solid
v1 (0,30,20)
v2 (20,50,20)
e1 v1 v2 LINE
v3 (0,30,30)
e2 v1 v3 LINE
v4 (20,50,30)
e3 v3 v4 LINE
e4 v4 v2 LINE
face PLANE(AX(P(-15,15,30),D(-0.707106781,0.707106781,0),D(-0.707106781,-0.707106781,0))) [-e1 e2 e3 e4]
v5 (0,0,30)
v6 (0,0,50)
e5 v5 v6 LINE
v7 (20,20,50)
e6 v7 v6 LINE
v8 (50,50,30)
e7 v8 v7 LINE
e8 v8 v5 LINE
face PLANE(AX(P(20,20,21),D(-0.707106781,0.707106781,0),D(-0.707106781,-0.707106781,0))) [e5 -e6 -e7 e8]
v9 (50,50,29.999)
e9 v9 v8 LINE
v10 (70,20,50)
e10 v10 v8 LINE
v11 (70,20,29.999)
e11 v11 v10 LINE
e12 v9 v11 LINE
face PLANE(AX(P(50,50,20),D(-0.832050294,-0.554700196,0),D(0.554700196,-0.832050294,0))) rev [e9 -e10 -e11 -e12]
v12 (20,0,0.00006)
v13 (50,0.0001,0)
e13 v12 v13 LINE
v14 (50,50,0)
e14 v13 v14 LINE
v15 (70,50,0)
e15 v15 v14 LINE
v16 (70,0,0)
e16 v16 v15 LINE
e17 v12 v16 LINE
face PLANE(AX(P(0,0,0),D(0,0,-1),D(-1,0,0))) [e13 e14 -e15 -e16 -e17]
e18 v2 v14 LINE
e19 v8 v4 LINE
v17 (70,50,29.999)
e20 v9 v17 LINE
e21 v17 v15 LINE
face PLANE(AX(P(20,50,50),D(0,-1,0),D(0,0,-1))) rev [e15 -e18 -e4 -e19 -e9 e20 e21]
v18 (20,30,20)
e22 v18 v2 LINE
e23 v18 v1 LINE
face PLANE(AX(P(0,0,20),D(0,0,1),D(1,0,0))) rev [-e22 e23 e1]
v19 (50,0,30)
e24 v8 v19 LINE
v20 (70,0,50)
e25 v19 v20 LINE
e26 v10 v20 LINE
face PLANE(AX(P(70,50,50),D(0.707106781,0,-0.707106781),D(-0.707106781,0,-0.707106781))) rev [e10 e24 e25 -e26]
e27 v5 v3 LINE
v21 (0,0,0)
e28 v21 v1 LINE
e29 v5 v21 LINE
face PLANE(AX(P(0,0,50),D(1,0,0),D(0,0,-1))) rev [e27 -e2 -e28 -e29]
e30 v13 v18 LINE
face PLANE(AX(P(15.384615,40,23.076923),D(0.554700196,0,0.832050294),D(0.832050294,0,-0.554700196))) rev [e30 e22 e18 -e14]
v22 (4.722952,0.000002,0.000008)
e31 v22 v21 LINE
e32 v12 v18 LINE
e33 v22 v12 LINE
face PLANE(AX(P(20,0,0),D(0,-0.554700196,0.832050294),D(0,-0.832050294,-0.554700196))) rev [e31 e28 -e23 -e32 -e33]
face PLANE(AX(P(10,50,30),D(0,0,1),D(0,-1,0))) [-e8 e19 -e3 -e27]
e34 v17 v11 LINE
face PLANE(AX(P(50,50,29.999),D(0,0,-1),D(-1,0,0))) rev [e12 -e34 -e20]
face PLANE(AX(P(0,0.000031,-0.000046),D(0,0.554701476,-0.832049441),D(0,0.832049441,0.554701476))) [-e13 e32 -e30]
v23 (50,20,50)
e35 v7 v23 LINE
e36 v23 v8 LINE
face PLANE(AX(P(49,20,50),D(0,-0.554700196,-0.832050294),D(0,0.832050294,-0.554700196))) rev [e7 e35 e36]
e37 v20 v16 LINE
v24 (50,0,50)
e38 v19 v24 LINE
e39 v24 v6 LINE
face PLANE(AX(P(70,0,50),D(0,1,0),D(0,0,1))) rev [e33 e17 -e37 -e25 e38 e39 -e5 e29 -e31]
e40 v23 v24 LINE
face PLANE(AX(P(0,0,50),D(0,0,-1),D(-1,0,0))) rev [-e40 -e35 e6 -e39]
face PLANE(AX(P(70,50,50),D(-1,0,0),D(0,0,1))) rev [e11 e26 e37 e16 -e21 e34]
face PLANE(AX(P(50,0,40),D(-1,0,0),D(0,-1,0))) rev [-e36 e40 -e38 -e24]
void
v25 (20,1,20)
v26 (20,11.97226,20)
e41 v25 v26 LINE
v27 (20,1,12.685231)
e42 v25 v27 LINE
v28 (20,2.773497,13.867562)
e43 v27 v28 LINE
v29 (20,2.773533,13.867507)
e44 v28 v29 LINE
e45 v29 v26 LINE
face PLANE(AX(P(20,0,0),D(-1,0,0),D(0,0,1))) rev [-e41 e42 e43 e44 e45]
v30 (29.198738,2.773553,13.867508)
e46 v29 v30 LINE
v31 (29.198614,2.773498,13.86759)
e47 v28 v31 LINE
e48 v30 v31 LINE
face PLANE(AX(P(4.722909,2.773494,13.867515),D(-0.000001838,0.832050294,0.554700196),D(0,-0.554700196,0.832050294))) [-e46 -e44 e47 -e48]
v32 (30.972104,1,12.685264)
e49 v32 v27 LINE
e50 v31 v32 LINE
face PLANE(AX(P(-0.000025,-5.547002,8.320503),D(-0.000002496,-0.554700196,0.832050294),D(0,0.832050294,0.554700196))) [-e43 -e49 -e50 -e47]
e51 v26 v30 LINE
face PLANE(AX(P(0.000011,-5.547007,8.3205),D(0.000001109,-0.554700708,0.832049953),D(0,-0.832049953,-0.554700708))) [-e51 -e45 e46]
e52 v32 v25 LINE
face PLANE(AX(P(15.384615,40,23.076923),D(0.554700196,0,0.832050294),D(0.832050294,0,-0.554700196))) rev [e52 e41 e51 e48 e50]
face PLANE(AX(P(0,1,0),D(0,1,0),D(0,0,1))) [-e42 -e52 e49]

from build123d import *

# Parameters (mm, degrees)
BOSS_EXTRUDE1_DEPTH  = 50
CUT_EXTRUDE2_DEPTH   = 10
CUT_EXTRUDE3_DEPTH   = 20
SKETCH4_W            = 20
SKETCH4_H            = 50
CUT_EXTRUDE4_DEPTH   = 10
CUT_EXTRUDE5_DEPTH   = 10
CUT_EXTRUDE6_DEPTH   = 20
SKETCH7_W            = 10
SKETCH7_H            = 20
CUT_EXTRUDE7_DEPTH   = 30
BOSS_EXTRUDE2_DEPTH  = 30
CUT_EXTRUDE10_DEPTH  = 72
CUT_EXTRUDE13_DEPTH  = 10
BOSS_EXTRUDE3_DEPTH  = 10
BOSS_EXTRUDE4_DEPTH  = 29
BOSS_EXTRUDE5_DEPTH  = 29
CUT_EXTRUDE15_DEPTH  = 29
CUT_EXTRUDE17_DEPTH  = 10
BOSS_EXTRUDE6_DEPTH  = 35
CUT_EXTRUDE21_DEPTH  = 10
CUT_EXTRUDE23_DEPTH  = 10
CUT_EXTRUDE24_DEPTH  = 10
CUT_EXTRUDE25_DEPTH  = 10
BOSS_EXTRUDE13_DEPTH = 19
BOSS_EXTRUDE14_DEPTH = 19
BOSS_EXTRUDE15_DEPTH = 19
CUT_EXTRUDE27_DEPTH  = 19
CUT_EXTRUDE28_DEPTH  = 10
BOSS_EXTRUDE16_DEPTH = 35
BOSS_EXTRUDE17_DEPTH = 29
CUT_EXTRUDE29_DEPTH  = 108
BOSS_EXTRUDE18_DEPTH = 30
CUT_EXTRUDE30_DEPTH  = 10
CUT_EXTRUDE31_DEPTH  = 20
CUT_EXTRUDE34_DEPTH  = 10
CUT_EXTRUDE35_DEPTH  = 10
SKETCH51_W           = 10
SKETCH51_H           = 20
BOSS_EXTRUDE20_DEPTH = 10
BOSS_EXTRUDE21_DEPTH = 10
BOSS_EXTRUDE23_DEPTH = 50
CUT_EXTRUDE36_DEPTH  = 50
SKETCH55_W           = 20
SKETCH55_H           = 9.999
CUT_EXTRUDE41_DEPTH  = 50
SKETCH57_W           = 20
SKETCH57_H           = 9.999
BOSS_EXTRUDE24_DEPTH = 30
CUT_EXTRUDE45_DEPTH  = 10
CUT_EXTRUDE46_DEPTH  = 40
BOSS_EXTRUDE25_DEPTH = 0.0001
BOSS_EXTRUDE28_DEPTH = 10
EXTRUDE_THIN1_DEPTH  = 10
BOSS_EXTRUDE30_DEPTH = 10
CUT_EXTRUDE48_DEPTH  = 10
CUT_EXTRUDE50_DEPTH  = 10
SKETCH68_W           = 25.723933528
SKETCH68_H           = 25.413889584
BOSS_EXTRUDE39_DEPTH = 1


with BuildPart() as part:
    # Sketch1 → Boss-Extrude1 (new body)
    with BuildSketch(Plane.XY):
        Polygon((0, 0), (0, 30), (20, 50), (70, 50), (70, 0), align=None)
    extrude(amount=BOSS_EXTRUDE1_DEPTH)

    # Sketch2 → Cut-Extrude2 (cut)
    with BuildSketch(Plane.XY.offset(50)):
        Polygon((0, 30), (0, 0), (50, 50), (20, 50), align=None)
    extrude(amount=-CUT_EXTRUDE2_DEPTH, mode=Mode.SUBTRACT)

    # Sketch3 → Cut-Extrude3 (cut)
    with BuildSketch(Plane.XY.offset(50)):
        Polygon((50, 20), (20, 20), (0, 0), (50, 0), align=None)
    extrude(amount=-CUT_EXTRUDE3_DEPTH, mode=Mode.SUBTRACT)

    # Sketch4 → Cut-Extrude4 (cut)
    with BuildSketch(Plane.XY.offset(50)):
        with Locations((60, 25)):
            Rectangle(SKETCH4_W, SKETCH4_H)
    extrude(amount=-CUT_EXTRUDE4_DEPTH, mode=Mode.SUBTRACT)

    # Sketch5 → Cut-Extrude5 (cut)
    with BuildSketch(Plane.XY.offset(40)):
        Polygon((50, 50), (70, 20), (70, 50), align=None)
    extrude(amount=-CUT_EXTRUDE5_DEPTH, mode=Mode.SUBTRACT)

    # Sketch6 → Cut-Extrude6 (cut)
    with BuildSketch(Plane.ZY):
        Polygon((0, 0), (20, 30), (20, 50), (0, 50), align=None)
    extrude(amount=-CUT_EXTRUDE6_DEPTH, mode=Mode.SUBTRACT)

    # Sketch7 → Cut-Extrude7 (cut)
    with BuildSketch(Plane.ZY):
        with Locations((25, 40)):
            Rectangle(SKETCH7_W, SKETCH7_H)
    extrude(amount=-CUT_EXTRUDE7_DEPTH, mode=Mode.SUBTRACT)

    # Sketch8 → Boss-Extrude2 (add)
    with BuildSketch(Plane.ZY):
        Polygon((30, 50), (30, 0), (50, 0), (50, 20), align=None)
    extrude(amount=-BOSS_EXTRUDE2_DEPTH)

    # Sketch10 → Cut-Extrude10 (cut)
    with BuildSketch(Plane.ZY):
        Polygon((30, 50), (50, 20), (50, 50), align=None)
    extrude(amount=-CUT_EXTRUDE10_DEPTH, mode=Mode.SUBTRACT)

    # Sketch11 → Cut-Extrude13 (cut)
    with BuildSketch(Plane(origin=(0, 0, 0), x_dir=(0, 0, -1), z_dir=(1, 0, 0))):
        Polygon((-30, 50), (-30, 0), (-50, 0), (-50, 20), align=None)
    extrude(amount=CUT_EXTRUDE13_DEPTH, mode=Mode.SUBTRACT)

    # Sketch12 → Boss-Extrude3 (add)
    with BuildSketch(Plane(origin=(0, 29.230769231, 43.846153846), x_dir=(1, 0, 0), z_dir=(0, 0.5547001962252294, 0.8320502943378435))):
        Polygon((30, 6.933752453), (35, 6.933752453), (30, 0.924500327), align=None)
    extrude(amount=-BOSS_EXTRUDE3_DEPTH)

    # Sketch14 → Boss-Extrude4 (add)
    with BuildSketch(Plane.XY.offset(50)):
        Polygon((50, 0), (70, 0), (70, 20), (50, 50), align=None)
    extrude(amount=-BOSS_EXTRUDE4_DEPTH)

    # Sketch15 → Boss-Extrude5 (add)
    with BuildSketch(Plane.XY.offset(50)):
        Polygon((50, 0), (0, 0), (20, 20), (50, 20), align=None)
    extrude(amount=-BOSS_EXTRUDE5_DEPTH)

    # Sketch16 → Cut-Extrude15 (cut)
    with BuildSketch(Plane.XY.offset(50)):
        Polygon((10, 10), (20, 20), (10, 20), align=None)
    extrude(amount=-CUT_EXTRUDE15_DEPTH, mode=Mode.SUBTRACT)

    # Sketch17 → Cut-Extrude17 (cut)
    with BuildSketch(Plane.XY.offset(50)):
        Polygon((50, 20), (50, 0), (70, 0), (70, 20), (50, 50), align=None)
    extrude(amount=-CUT_EXTRUDE17_DEPTH, mode=Mode.SUBTRACT)

    # Sketch18 → Boss-Extrude6 (add)
    with BuildSketch(Plane.XY.offset(50)):
        Polygon((50, 20), (50, 50), (20, 20), align=None)
    extrude(amount=-BOSS_EXTRUDE6_DEPTH)

    # Sketch20 → Cut-Extrude21 (cut)
    with BuildSketch(Plane(origin=(0, 29.230769231, 43.846153846), x_dir=(1, 0, 0), z_dir=(0, 0.5547001962252294, 0.8320502943378435))):
        Polygon((20, -11.094003925), (50, 24.96150883), (10, 24.96150883), (10, -11.094003925), align=None)
    extrude(amount=-CUT_EXTRUDE21_DEPTH, mode=Mode.SUBTRACT)

    # Sketch26 → Cut-Extrude23 (cut)
    with BuildSketch(Plane.XY.offset(50)):
        Polygon((50, 50), (50, 20), (20, 20), align=None)
    extrude(amount=-CUT_EXTRUDE23_DEPTH, mode=Mode.SUBTRACT)

    # Sketch28 → Cut-Extrude24 (cut)
    with BuildSketch(Plane.XY.offset(40)):
        Polygon((50, 20), (50, 50), (24.615384615, 20), align=None)
    extrude(amount=-CUT_EXTRUDE24_DEPTH, mode=Mode.SUBTRACT)


with BuildPart() as cut_extrude24_piece_1:
    # of the separate pieces the step leaves, piece 1, a body of its own (cut_extrude24_pieces)
    add(part.part.solids().sort_by_distance((0, 0, 0))[0])

    # Sketch32 → Boss-Extrude13 (add)
    with BuildSketch(Plane.XY.offset(35)):
        Polygon((20, 20), (50, 20), (50, 50), align=None)
    extrude(amount=-BOSS_EXTRUDE13_DEPTH)

    # Sketch33 → Boss-Extrude14 (add)
    with BuildSketch(Plane(origin=(0, 0, 0), x_dir=(0, 0, 1), z_dir=(-0.7071067811865476, 0.7071067811865475, 0))):
        Polygon((41.679497057, 20.439625842), (37.981495748, 28.284271247), (50, 28.284271247), align=None)
    extrude(amount=-BOSS_EXTRUDE14_DEPTH)

    # Sketch34 → Boss-Extrude15 (add)
    with BuildSketch(Plane(origin=(0, 20, 0), x_dir=(1, 0, 0), z_dir=(0, 1, 0))):
        Polygon((25.547001962, -37.981495748), (20, -37.981495748), (20, -50), align=None)
    extrude(amount=-BOSS_EXTRUDE15_DEPTH)

    # Sketch36 → Cut-Extrude27 (cut)
    with BuildSketch(Plane.XY.offset(35)):
        Polygon((28.399590758, 24.472243623), (24.615384615, 20), (8.952966546, 20), (8.952966546, 24.472243623), align=None)
    extrude(amount=CUT_EXTRUDE27_DEPTH, mode=Mode.SUBTRACT)

    # Sketch37 → Cut-Extrude28 (cut)
    with BuildSketch(Plane.XY.offset(35)):
        Polygon((24.472243623, 24.472243623), (20, 20), (10, 20), (10, 24.472243623), align=None)
    extrude(amount=-CUT_EXTRUDE28_DEPTH, mode=Mode.SUBTRACT)

    # Sketch39 → Boss-Extrude16 (add)
    with BuildSketch(Plane.ZY.offset(-30)):
        Polygon((30, 31.972243623), (30, 50), (21.679497057, 44.452998038), align=None)
    extrude(amount=-BOSS_EXTRUDE16_DEPTH)

    # Sketch41 → Boss-Extrude17 (add)
    with BuildSketch(Plane(origin=(20, 0, 0), x_dir=(0, 0, -1), z_dir=(1, 0, 0))):
        Polygon((-30, 0), (-50, 0), (-50, 20), (-30, 50), align=None)
    extrude(amount=BOSS_EXTRUDE17_DEPTH)

    # Sketch42 → Cut-Extrude29 (cut)
    with BuildSketch(Plane.ZY):
        Polygon((50, 50), (50, 20), (30, 50), align=None)
    extrude(amount=-CUT_EXTRUDE29_DEPTH, mode=Mode.SUBTRACT)

    # Sketch43 → Boss-Extrude18 (add)
    with BuildSketch(Plane.ZY.offset(-20)):
        Polygon((30, 50), (30, 20), (50, 20), align=None)
    extrude(amount=-BOSS_EXTRUDE18_DEPTH)

    # Sketch44 → Cut-Extrude30 (cut)
    with BuildSketch(Plane.ZY.offset(-10)):
        Polygon((30, 24.472243623), (30, 31.972243623), (35, 24.472243623), align=None)
    extrude(amount=-CUT_EXTRUDE30_DEPTH, mode=Mode.SUBTRACT)

    # Sketch45 → Cut-Extrude31 (cut)
    with BuildSketch(Plane.XY.offset(50)):
        Polygon((20, 20), (50, 50), (20, 50), align=None)
    extrude(amount=-CUT_EXTRUDE31_DEPTH, mode=Mode.SUBTRACT)

    # Sketch48 → Cut-Extrude34 (cut)
    with BuildSketch(Plane.XY.offset(40)):
        Polygon((70, 0), (70, 20), (60, 35), (50, 35), (50, 0), align=None)
        Polygon((50, 50), (50, 35), (60, 35), align=None)
    extrude(amount=-CUT_EXTRUDE34_DEPTH, mode=Mode.SUBTRACT)

    # Sketch49 → Cut-Extrude35 (cut)
    with BuildSketch(Plane.XY.offset(30)):
        Polygon((50, 50), (70, 20), (70, 50), align=None)
    extrude(amount=-CUT_EXTRUDE35_DEPTH, mode=Mode.SUBTRACT)

    # Sketch51 → Boss-Extrude20 (add)
    with BuildSketch(Plane.XY.offset(20)):
        with Locations((25, 40)):
            Rectangle(SKETCH51_W, SKETCH51_H)
        Polygon((20, 30), (0, 30), (20, 50), align=None)
    extrude(amount=BOSS_EXTRUDE20_DEPTH)

    # Sketch52 → Boss-Extrude21 (add)
    with BuildSketch(Plane.XY.offset(30)):
        Polygon((10, 10), (24.472243623, 24.472243623), (10, 24.472243623), align=None)
    extrude(amount=-BOSS_EXTRUDE21_DEPTH)

    # Sketch53 → Boss-Extrude23 (add)
    with BuildSketch(Plane(origin=(0, 0, 0), x_dir=(1, 0, 0), z_dir=(0, 1, 0))):
        Polygon((70, -30), (70, -50), (50, -30), align=None)
    extrude(amount=BOSS_EXTRUDE23_DEPTH)

    # Sketch54 → Cut-Extrude36 (cut)
    with BuildSketch(Plane(origin=(0, 0, 30), x_dir=(-1, 0, 0), z_dir=(0, 0, -1))):
        Polygon((-70, 20), (-50, 50), (-70, 50), align=None)
    extrude(amount=-CUT_EXTRUDE36_DEPTH, mode=Mode.SUBTRACT)

    # Sketch55 → Cut-Extrude41 (cut)
    with BuildSketch(Plane(origin=(0, 20, 0), x_dir=(1, 0, 0), z_dir=(0, 1, 0))):
        with Locations((60, -24.9995)):
            Rectangle(SKETCH55_W, SKETCH55_H)
    extrude(amount=CUT_EXTRUDE41_DEPTH, mode=Mode.SUBTRACT)

    # Sketch57 → Boss-Extrude24 (add)
    with BuildSketch(Plane(origin=(0, 20, 0), x_dir=(1, 0, 0), z_dir=(0, 1, 0))):
        with Locations((60, -24.9995)):
            Rectangle(SKETCH57_W, SKETCH57_H)
    extrude(amount=BOSS_EXTRUDE24_DEPTH)

    # Sketch58 → Cut-Extrude45 (cut)
    with BuildSketch(Plane(origin=(0, 50, 0), x_dir=(1, 0, 0), z_dir=(0, 1, 0))):
        Polygon((20, -20), (50, 0), (20, 0), align=None)
    extrude(amount=-CUT_EXTRUDE45_DEPTH, mode=Mode.SUBTRACT)

    # Sketch59 → Cut-Extrude46 (cut)
    with BuildSketch(Plane(origin=(0, 40, 0), x_dir=(1, 0, 0), z_dir=(0, 1, 0))):
        Polygon((20, 0), (20, -20), (50, 0), align=None)
    extrude(amount=-CUT_EXTRUDE46_DEPTH, mode=Mode.SUBTRACT)

    # Sketch60 → Boss-Extrude25 (add)
    with BuildSketch(Plane.XZ):
        Polygon((20, 0), (50, 0), (20, 20), align=None)
    extrude(amount=-BOSS_EXTRUDE25_DEPTH)

    # Sketch61 → Boss-Extrude28 (add)
    with BuildSketch(Plane(origin=(0, 3.0769e-05, -4.6154e-05), x_dir=(1, 0, 0), z_dir=(0, -0.5547014763049025, 0.8320494409499725))):
        Polygon((50, 8.3205e-05), (20, 36.055512755), (20, 8.3205e-05), align=None)
    extrude(amount=BOSS_EXTRUDE28_DEPTH)

    # Sketch62 → Extrude-Thin1 (add)
    with BuildSketch(Plane(origin=(0, 0, 0), x_dir=(-0.9999999999968847, 1.384610769127148e-06, -2.0769161536907223e-06), z_dir=(2.496142562323782e-06, 0.5547001962235016, -0.8320502943352512))):
        Polygon((0, 36.055512755), (-4.722952829, 0), (-50, 8.3205e-05), (-49.999981623, 10.000083205), (-13.498467783, 10.000016127), (-9.915295125, 37.354328597), align=None)
    extrude(amount=-EXTRUDE_THIN1_DEPTH)

    # Sketch63 → Boss-Extrude30 (add)
    with BuildSketch(Plane(origin=(0, 0, 0), x_dir=(-0.9999999999993847, -6.153857514652135e-07, 9.230773964263176e-07), z_dir=(-1.109401416485302e-06, 0.5547007082562057, -0.8320499529828923))):
        Polygon((-20, 36.055512755), (0, 0), (-50, 8.3205e-05), align=None)
    extrude(amount=-BOSS_EXTRUDE30_DEPTH)


with BuildPart() as cut_extrude24_piece_2:
    # of the separate pieces the step leaves, piece 2, a body of its own (cut_extrude24_pieces)
    add(part.part.solids().sort_by_distance((35, 35, 40))[0])

    # Sketch30 → Cut-Extrude25 (cut)
    with BuildSketch(Plane(origin=(4.482758621, -3.793103448, 0), x_dir=(0, 0, 1), z_dir=(-0.7633862853691147, 0.6459422414661738, 0))):
        Polygon((30, 70.466426342), (40, 70.466426342), (40, 31.16784242), align=None)
    extrude(amount=CUT_EXTRUDE25_DEPTH, mode=Mode.SUBTRACT)


with BuildPart() as boss_extrude30_kept_piece:
    # of the separate pieces the step leaves, the one the design keeps (boss_extrude30_pieces_kept)
    add(cut_extrude24_piece_1.part.solids().sort_by_distance((0, 0, 0))[0])

    # Sketch64 → Cut-Extrude48 (cut)
    with BuildSketch(Plane(origin=(0, 0, 0), x_dir=(-1, 0, 0), z_dir=(0, -1, 0))):
        Polygon((-49.999962787, -12.018654251), (-50.000000002, -0.000150001), (0, 0), (-3.698015816, -12.018504252), align=None)
    extrude(amount=CUT_EXTRUDE48_DEPTH, mode=Mode.SUBTRACT)


with BuildPart() as cut_extrude48_piece_1:
    # of the separate pieces the step leaves, piece 1, a body of its own (cut_extrude48_pieces_kept)
    add(boss_extrude30_kept_piece.part.solids().sort_by_distance((0, 30, 20))[0])

    # Sketch68 → Boss-Extrude39 (add)
    with BuildSketch(Plane.XZ):
        with Locations((25.237412158, 15.000389629)):
            Rectangle(SKETCH68_W, SKETCH68_H)
    extrude(amount=-BOSS_EXTRUDE39_DEPTH)


with BuildPart() as cut_extrude48_piece_2:
    # of the separate pieces the step leaves, piece 2, a body of its own (cut_extrude48_pieces_kept)
    add(boss_extrude30_kept_piece.part.solids().sort_by_distance((1.1094e-05, -5.547007083, 8.32049953))[0])

    # Sketch67 → Cut-Extrude50 (cut)
    with BuildSketch(Plane(origin=(0, 0, 0), x_dir=(0.2443048636302998, -0.11275589430574709, 0.9631205749572023), z_dir=(-0.8744746321945025, 0.4036029726775825, 0.2690701731781287))):
        Polygon((8.639104746, -5.03645403), (0, 0), (12.478711974, 1.54968154), align=None)
    extrude(amount=-CUT_EXTRUDE50_DEPTH, mode=Mode.SUBTRACT)


solid = cut_extrude48_piece_1.part
